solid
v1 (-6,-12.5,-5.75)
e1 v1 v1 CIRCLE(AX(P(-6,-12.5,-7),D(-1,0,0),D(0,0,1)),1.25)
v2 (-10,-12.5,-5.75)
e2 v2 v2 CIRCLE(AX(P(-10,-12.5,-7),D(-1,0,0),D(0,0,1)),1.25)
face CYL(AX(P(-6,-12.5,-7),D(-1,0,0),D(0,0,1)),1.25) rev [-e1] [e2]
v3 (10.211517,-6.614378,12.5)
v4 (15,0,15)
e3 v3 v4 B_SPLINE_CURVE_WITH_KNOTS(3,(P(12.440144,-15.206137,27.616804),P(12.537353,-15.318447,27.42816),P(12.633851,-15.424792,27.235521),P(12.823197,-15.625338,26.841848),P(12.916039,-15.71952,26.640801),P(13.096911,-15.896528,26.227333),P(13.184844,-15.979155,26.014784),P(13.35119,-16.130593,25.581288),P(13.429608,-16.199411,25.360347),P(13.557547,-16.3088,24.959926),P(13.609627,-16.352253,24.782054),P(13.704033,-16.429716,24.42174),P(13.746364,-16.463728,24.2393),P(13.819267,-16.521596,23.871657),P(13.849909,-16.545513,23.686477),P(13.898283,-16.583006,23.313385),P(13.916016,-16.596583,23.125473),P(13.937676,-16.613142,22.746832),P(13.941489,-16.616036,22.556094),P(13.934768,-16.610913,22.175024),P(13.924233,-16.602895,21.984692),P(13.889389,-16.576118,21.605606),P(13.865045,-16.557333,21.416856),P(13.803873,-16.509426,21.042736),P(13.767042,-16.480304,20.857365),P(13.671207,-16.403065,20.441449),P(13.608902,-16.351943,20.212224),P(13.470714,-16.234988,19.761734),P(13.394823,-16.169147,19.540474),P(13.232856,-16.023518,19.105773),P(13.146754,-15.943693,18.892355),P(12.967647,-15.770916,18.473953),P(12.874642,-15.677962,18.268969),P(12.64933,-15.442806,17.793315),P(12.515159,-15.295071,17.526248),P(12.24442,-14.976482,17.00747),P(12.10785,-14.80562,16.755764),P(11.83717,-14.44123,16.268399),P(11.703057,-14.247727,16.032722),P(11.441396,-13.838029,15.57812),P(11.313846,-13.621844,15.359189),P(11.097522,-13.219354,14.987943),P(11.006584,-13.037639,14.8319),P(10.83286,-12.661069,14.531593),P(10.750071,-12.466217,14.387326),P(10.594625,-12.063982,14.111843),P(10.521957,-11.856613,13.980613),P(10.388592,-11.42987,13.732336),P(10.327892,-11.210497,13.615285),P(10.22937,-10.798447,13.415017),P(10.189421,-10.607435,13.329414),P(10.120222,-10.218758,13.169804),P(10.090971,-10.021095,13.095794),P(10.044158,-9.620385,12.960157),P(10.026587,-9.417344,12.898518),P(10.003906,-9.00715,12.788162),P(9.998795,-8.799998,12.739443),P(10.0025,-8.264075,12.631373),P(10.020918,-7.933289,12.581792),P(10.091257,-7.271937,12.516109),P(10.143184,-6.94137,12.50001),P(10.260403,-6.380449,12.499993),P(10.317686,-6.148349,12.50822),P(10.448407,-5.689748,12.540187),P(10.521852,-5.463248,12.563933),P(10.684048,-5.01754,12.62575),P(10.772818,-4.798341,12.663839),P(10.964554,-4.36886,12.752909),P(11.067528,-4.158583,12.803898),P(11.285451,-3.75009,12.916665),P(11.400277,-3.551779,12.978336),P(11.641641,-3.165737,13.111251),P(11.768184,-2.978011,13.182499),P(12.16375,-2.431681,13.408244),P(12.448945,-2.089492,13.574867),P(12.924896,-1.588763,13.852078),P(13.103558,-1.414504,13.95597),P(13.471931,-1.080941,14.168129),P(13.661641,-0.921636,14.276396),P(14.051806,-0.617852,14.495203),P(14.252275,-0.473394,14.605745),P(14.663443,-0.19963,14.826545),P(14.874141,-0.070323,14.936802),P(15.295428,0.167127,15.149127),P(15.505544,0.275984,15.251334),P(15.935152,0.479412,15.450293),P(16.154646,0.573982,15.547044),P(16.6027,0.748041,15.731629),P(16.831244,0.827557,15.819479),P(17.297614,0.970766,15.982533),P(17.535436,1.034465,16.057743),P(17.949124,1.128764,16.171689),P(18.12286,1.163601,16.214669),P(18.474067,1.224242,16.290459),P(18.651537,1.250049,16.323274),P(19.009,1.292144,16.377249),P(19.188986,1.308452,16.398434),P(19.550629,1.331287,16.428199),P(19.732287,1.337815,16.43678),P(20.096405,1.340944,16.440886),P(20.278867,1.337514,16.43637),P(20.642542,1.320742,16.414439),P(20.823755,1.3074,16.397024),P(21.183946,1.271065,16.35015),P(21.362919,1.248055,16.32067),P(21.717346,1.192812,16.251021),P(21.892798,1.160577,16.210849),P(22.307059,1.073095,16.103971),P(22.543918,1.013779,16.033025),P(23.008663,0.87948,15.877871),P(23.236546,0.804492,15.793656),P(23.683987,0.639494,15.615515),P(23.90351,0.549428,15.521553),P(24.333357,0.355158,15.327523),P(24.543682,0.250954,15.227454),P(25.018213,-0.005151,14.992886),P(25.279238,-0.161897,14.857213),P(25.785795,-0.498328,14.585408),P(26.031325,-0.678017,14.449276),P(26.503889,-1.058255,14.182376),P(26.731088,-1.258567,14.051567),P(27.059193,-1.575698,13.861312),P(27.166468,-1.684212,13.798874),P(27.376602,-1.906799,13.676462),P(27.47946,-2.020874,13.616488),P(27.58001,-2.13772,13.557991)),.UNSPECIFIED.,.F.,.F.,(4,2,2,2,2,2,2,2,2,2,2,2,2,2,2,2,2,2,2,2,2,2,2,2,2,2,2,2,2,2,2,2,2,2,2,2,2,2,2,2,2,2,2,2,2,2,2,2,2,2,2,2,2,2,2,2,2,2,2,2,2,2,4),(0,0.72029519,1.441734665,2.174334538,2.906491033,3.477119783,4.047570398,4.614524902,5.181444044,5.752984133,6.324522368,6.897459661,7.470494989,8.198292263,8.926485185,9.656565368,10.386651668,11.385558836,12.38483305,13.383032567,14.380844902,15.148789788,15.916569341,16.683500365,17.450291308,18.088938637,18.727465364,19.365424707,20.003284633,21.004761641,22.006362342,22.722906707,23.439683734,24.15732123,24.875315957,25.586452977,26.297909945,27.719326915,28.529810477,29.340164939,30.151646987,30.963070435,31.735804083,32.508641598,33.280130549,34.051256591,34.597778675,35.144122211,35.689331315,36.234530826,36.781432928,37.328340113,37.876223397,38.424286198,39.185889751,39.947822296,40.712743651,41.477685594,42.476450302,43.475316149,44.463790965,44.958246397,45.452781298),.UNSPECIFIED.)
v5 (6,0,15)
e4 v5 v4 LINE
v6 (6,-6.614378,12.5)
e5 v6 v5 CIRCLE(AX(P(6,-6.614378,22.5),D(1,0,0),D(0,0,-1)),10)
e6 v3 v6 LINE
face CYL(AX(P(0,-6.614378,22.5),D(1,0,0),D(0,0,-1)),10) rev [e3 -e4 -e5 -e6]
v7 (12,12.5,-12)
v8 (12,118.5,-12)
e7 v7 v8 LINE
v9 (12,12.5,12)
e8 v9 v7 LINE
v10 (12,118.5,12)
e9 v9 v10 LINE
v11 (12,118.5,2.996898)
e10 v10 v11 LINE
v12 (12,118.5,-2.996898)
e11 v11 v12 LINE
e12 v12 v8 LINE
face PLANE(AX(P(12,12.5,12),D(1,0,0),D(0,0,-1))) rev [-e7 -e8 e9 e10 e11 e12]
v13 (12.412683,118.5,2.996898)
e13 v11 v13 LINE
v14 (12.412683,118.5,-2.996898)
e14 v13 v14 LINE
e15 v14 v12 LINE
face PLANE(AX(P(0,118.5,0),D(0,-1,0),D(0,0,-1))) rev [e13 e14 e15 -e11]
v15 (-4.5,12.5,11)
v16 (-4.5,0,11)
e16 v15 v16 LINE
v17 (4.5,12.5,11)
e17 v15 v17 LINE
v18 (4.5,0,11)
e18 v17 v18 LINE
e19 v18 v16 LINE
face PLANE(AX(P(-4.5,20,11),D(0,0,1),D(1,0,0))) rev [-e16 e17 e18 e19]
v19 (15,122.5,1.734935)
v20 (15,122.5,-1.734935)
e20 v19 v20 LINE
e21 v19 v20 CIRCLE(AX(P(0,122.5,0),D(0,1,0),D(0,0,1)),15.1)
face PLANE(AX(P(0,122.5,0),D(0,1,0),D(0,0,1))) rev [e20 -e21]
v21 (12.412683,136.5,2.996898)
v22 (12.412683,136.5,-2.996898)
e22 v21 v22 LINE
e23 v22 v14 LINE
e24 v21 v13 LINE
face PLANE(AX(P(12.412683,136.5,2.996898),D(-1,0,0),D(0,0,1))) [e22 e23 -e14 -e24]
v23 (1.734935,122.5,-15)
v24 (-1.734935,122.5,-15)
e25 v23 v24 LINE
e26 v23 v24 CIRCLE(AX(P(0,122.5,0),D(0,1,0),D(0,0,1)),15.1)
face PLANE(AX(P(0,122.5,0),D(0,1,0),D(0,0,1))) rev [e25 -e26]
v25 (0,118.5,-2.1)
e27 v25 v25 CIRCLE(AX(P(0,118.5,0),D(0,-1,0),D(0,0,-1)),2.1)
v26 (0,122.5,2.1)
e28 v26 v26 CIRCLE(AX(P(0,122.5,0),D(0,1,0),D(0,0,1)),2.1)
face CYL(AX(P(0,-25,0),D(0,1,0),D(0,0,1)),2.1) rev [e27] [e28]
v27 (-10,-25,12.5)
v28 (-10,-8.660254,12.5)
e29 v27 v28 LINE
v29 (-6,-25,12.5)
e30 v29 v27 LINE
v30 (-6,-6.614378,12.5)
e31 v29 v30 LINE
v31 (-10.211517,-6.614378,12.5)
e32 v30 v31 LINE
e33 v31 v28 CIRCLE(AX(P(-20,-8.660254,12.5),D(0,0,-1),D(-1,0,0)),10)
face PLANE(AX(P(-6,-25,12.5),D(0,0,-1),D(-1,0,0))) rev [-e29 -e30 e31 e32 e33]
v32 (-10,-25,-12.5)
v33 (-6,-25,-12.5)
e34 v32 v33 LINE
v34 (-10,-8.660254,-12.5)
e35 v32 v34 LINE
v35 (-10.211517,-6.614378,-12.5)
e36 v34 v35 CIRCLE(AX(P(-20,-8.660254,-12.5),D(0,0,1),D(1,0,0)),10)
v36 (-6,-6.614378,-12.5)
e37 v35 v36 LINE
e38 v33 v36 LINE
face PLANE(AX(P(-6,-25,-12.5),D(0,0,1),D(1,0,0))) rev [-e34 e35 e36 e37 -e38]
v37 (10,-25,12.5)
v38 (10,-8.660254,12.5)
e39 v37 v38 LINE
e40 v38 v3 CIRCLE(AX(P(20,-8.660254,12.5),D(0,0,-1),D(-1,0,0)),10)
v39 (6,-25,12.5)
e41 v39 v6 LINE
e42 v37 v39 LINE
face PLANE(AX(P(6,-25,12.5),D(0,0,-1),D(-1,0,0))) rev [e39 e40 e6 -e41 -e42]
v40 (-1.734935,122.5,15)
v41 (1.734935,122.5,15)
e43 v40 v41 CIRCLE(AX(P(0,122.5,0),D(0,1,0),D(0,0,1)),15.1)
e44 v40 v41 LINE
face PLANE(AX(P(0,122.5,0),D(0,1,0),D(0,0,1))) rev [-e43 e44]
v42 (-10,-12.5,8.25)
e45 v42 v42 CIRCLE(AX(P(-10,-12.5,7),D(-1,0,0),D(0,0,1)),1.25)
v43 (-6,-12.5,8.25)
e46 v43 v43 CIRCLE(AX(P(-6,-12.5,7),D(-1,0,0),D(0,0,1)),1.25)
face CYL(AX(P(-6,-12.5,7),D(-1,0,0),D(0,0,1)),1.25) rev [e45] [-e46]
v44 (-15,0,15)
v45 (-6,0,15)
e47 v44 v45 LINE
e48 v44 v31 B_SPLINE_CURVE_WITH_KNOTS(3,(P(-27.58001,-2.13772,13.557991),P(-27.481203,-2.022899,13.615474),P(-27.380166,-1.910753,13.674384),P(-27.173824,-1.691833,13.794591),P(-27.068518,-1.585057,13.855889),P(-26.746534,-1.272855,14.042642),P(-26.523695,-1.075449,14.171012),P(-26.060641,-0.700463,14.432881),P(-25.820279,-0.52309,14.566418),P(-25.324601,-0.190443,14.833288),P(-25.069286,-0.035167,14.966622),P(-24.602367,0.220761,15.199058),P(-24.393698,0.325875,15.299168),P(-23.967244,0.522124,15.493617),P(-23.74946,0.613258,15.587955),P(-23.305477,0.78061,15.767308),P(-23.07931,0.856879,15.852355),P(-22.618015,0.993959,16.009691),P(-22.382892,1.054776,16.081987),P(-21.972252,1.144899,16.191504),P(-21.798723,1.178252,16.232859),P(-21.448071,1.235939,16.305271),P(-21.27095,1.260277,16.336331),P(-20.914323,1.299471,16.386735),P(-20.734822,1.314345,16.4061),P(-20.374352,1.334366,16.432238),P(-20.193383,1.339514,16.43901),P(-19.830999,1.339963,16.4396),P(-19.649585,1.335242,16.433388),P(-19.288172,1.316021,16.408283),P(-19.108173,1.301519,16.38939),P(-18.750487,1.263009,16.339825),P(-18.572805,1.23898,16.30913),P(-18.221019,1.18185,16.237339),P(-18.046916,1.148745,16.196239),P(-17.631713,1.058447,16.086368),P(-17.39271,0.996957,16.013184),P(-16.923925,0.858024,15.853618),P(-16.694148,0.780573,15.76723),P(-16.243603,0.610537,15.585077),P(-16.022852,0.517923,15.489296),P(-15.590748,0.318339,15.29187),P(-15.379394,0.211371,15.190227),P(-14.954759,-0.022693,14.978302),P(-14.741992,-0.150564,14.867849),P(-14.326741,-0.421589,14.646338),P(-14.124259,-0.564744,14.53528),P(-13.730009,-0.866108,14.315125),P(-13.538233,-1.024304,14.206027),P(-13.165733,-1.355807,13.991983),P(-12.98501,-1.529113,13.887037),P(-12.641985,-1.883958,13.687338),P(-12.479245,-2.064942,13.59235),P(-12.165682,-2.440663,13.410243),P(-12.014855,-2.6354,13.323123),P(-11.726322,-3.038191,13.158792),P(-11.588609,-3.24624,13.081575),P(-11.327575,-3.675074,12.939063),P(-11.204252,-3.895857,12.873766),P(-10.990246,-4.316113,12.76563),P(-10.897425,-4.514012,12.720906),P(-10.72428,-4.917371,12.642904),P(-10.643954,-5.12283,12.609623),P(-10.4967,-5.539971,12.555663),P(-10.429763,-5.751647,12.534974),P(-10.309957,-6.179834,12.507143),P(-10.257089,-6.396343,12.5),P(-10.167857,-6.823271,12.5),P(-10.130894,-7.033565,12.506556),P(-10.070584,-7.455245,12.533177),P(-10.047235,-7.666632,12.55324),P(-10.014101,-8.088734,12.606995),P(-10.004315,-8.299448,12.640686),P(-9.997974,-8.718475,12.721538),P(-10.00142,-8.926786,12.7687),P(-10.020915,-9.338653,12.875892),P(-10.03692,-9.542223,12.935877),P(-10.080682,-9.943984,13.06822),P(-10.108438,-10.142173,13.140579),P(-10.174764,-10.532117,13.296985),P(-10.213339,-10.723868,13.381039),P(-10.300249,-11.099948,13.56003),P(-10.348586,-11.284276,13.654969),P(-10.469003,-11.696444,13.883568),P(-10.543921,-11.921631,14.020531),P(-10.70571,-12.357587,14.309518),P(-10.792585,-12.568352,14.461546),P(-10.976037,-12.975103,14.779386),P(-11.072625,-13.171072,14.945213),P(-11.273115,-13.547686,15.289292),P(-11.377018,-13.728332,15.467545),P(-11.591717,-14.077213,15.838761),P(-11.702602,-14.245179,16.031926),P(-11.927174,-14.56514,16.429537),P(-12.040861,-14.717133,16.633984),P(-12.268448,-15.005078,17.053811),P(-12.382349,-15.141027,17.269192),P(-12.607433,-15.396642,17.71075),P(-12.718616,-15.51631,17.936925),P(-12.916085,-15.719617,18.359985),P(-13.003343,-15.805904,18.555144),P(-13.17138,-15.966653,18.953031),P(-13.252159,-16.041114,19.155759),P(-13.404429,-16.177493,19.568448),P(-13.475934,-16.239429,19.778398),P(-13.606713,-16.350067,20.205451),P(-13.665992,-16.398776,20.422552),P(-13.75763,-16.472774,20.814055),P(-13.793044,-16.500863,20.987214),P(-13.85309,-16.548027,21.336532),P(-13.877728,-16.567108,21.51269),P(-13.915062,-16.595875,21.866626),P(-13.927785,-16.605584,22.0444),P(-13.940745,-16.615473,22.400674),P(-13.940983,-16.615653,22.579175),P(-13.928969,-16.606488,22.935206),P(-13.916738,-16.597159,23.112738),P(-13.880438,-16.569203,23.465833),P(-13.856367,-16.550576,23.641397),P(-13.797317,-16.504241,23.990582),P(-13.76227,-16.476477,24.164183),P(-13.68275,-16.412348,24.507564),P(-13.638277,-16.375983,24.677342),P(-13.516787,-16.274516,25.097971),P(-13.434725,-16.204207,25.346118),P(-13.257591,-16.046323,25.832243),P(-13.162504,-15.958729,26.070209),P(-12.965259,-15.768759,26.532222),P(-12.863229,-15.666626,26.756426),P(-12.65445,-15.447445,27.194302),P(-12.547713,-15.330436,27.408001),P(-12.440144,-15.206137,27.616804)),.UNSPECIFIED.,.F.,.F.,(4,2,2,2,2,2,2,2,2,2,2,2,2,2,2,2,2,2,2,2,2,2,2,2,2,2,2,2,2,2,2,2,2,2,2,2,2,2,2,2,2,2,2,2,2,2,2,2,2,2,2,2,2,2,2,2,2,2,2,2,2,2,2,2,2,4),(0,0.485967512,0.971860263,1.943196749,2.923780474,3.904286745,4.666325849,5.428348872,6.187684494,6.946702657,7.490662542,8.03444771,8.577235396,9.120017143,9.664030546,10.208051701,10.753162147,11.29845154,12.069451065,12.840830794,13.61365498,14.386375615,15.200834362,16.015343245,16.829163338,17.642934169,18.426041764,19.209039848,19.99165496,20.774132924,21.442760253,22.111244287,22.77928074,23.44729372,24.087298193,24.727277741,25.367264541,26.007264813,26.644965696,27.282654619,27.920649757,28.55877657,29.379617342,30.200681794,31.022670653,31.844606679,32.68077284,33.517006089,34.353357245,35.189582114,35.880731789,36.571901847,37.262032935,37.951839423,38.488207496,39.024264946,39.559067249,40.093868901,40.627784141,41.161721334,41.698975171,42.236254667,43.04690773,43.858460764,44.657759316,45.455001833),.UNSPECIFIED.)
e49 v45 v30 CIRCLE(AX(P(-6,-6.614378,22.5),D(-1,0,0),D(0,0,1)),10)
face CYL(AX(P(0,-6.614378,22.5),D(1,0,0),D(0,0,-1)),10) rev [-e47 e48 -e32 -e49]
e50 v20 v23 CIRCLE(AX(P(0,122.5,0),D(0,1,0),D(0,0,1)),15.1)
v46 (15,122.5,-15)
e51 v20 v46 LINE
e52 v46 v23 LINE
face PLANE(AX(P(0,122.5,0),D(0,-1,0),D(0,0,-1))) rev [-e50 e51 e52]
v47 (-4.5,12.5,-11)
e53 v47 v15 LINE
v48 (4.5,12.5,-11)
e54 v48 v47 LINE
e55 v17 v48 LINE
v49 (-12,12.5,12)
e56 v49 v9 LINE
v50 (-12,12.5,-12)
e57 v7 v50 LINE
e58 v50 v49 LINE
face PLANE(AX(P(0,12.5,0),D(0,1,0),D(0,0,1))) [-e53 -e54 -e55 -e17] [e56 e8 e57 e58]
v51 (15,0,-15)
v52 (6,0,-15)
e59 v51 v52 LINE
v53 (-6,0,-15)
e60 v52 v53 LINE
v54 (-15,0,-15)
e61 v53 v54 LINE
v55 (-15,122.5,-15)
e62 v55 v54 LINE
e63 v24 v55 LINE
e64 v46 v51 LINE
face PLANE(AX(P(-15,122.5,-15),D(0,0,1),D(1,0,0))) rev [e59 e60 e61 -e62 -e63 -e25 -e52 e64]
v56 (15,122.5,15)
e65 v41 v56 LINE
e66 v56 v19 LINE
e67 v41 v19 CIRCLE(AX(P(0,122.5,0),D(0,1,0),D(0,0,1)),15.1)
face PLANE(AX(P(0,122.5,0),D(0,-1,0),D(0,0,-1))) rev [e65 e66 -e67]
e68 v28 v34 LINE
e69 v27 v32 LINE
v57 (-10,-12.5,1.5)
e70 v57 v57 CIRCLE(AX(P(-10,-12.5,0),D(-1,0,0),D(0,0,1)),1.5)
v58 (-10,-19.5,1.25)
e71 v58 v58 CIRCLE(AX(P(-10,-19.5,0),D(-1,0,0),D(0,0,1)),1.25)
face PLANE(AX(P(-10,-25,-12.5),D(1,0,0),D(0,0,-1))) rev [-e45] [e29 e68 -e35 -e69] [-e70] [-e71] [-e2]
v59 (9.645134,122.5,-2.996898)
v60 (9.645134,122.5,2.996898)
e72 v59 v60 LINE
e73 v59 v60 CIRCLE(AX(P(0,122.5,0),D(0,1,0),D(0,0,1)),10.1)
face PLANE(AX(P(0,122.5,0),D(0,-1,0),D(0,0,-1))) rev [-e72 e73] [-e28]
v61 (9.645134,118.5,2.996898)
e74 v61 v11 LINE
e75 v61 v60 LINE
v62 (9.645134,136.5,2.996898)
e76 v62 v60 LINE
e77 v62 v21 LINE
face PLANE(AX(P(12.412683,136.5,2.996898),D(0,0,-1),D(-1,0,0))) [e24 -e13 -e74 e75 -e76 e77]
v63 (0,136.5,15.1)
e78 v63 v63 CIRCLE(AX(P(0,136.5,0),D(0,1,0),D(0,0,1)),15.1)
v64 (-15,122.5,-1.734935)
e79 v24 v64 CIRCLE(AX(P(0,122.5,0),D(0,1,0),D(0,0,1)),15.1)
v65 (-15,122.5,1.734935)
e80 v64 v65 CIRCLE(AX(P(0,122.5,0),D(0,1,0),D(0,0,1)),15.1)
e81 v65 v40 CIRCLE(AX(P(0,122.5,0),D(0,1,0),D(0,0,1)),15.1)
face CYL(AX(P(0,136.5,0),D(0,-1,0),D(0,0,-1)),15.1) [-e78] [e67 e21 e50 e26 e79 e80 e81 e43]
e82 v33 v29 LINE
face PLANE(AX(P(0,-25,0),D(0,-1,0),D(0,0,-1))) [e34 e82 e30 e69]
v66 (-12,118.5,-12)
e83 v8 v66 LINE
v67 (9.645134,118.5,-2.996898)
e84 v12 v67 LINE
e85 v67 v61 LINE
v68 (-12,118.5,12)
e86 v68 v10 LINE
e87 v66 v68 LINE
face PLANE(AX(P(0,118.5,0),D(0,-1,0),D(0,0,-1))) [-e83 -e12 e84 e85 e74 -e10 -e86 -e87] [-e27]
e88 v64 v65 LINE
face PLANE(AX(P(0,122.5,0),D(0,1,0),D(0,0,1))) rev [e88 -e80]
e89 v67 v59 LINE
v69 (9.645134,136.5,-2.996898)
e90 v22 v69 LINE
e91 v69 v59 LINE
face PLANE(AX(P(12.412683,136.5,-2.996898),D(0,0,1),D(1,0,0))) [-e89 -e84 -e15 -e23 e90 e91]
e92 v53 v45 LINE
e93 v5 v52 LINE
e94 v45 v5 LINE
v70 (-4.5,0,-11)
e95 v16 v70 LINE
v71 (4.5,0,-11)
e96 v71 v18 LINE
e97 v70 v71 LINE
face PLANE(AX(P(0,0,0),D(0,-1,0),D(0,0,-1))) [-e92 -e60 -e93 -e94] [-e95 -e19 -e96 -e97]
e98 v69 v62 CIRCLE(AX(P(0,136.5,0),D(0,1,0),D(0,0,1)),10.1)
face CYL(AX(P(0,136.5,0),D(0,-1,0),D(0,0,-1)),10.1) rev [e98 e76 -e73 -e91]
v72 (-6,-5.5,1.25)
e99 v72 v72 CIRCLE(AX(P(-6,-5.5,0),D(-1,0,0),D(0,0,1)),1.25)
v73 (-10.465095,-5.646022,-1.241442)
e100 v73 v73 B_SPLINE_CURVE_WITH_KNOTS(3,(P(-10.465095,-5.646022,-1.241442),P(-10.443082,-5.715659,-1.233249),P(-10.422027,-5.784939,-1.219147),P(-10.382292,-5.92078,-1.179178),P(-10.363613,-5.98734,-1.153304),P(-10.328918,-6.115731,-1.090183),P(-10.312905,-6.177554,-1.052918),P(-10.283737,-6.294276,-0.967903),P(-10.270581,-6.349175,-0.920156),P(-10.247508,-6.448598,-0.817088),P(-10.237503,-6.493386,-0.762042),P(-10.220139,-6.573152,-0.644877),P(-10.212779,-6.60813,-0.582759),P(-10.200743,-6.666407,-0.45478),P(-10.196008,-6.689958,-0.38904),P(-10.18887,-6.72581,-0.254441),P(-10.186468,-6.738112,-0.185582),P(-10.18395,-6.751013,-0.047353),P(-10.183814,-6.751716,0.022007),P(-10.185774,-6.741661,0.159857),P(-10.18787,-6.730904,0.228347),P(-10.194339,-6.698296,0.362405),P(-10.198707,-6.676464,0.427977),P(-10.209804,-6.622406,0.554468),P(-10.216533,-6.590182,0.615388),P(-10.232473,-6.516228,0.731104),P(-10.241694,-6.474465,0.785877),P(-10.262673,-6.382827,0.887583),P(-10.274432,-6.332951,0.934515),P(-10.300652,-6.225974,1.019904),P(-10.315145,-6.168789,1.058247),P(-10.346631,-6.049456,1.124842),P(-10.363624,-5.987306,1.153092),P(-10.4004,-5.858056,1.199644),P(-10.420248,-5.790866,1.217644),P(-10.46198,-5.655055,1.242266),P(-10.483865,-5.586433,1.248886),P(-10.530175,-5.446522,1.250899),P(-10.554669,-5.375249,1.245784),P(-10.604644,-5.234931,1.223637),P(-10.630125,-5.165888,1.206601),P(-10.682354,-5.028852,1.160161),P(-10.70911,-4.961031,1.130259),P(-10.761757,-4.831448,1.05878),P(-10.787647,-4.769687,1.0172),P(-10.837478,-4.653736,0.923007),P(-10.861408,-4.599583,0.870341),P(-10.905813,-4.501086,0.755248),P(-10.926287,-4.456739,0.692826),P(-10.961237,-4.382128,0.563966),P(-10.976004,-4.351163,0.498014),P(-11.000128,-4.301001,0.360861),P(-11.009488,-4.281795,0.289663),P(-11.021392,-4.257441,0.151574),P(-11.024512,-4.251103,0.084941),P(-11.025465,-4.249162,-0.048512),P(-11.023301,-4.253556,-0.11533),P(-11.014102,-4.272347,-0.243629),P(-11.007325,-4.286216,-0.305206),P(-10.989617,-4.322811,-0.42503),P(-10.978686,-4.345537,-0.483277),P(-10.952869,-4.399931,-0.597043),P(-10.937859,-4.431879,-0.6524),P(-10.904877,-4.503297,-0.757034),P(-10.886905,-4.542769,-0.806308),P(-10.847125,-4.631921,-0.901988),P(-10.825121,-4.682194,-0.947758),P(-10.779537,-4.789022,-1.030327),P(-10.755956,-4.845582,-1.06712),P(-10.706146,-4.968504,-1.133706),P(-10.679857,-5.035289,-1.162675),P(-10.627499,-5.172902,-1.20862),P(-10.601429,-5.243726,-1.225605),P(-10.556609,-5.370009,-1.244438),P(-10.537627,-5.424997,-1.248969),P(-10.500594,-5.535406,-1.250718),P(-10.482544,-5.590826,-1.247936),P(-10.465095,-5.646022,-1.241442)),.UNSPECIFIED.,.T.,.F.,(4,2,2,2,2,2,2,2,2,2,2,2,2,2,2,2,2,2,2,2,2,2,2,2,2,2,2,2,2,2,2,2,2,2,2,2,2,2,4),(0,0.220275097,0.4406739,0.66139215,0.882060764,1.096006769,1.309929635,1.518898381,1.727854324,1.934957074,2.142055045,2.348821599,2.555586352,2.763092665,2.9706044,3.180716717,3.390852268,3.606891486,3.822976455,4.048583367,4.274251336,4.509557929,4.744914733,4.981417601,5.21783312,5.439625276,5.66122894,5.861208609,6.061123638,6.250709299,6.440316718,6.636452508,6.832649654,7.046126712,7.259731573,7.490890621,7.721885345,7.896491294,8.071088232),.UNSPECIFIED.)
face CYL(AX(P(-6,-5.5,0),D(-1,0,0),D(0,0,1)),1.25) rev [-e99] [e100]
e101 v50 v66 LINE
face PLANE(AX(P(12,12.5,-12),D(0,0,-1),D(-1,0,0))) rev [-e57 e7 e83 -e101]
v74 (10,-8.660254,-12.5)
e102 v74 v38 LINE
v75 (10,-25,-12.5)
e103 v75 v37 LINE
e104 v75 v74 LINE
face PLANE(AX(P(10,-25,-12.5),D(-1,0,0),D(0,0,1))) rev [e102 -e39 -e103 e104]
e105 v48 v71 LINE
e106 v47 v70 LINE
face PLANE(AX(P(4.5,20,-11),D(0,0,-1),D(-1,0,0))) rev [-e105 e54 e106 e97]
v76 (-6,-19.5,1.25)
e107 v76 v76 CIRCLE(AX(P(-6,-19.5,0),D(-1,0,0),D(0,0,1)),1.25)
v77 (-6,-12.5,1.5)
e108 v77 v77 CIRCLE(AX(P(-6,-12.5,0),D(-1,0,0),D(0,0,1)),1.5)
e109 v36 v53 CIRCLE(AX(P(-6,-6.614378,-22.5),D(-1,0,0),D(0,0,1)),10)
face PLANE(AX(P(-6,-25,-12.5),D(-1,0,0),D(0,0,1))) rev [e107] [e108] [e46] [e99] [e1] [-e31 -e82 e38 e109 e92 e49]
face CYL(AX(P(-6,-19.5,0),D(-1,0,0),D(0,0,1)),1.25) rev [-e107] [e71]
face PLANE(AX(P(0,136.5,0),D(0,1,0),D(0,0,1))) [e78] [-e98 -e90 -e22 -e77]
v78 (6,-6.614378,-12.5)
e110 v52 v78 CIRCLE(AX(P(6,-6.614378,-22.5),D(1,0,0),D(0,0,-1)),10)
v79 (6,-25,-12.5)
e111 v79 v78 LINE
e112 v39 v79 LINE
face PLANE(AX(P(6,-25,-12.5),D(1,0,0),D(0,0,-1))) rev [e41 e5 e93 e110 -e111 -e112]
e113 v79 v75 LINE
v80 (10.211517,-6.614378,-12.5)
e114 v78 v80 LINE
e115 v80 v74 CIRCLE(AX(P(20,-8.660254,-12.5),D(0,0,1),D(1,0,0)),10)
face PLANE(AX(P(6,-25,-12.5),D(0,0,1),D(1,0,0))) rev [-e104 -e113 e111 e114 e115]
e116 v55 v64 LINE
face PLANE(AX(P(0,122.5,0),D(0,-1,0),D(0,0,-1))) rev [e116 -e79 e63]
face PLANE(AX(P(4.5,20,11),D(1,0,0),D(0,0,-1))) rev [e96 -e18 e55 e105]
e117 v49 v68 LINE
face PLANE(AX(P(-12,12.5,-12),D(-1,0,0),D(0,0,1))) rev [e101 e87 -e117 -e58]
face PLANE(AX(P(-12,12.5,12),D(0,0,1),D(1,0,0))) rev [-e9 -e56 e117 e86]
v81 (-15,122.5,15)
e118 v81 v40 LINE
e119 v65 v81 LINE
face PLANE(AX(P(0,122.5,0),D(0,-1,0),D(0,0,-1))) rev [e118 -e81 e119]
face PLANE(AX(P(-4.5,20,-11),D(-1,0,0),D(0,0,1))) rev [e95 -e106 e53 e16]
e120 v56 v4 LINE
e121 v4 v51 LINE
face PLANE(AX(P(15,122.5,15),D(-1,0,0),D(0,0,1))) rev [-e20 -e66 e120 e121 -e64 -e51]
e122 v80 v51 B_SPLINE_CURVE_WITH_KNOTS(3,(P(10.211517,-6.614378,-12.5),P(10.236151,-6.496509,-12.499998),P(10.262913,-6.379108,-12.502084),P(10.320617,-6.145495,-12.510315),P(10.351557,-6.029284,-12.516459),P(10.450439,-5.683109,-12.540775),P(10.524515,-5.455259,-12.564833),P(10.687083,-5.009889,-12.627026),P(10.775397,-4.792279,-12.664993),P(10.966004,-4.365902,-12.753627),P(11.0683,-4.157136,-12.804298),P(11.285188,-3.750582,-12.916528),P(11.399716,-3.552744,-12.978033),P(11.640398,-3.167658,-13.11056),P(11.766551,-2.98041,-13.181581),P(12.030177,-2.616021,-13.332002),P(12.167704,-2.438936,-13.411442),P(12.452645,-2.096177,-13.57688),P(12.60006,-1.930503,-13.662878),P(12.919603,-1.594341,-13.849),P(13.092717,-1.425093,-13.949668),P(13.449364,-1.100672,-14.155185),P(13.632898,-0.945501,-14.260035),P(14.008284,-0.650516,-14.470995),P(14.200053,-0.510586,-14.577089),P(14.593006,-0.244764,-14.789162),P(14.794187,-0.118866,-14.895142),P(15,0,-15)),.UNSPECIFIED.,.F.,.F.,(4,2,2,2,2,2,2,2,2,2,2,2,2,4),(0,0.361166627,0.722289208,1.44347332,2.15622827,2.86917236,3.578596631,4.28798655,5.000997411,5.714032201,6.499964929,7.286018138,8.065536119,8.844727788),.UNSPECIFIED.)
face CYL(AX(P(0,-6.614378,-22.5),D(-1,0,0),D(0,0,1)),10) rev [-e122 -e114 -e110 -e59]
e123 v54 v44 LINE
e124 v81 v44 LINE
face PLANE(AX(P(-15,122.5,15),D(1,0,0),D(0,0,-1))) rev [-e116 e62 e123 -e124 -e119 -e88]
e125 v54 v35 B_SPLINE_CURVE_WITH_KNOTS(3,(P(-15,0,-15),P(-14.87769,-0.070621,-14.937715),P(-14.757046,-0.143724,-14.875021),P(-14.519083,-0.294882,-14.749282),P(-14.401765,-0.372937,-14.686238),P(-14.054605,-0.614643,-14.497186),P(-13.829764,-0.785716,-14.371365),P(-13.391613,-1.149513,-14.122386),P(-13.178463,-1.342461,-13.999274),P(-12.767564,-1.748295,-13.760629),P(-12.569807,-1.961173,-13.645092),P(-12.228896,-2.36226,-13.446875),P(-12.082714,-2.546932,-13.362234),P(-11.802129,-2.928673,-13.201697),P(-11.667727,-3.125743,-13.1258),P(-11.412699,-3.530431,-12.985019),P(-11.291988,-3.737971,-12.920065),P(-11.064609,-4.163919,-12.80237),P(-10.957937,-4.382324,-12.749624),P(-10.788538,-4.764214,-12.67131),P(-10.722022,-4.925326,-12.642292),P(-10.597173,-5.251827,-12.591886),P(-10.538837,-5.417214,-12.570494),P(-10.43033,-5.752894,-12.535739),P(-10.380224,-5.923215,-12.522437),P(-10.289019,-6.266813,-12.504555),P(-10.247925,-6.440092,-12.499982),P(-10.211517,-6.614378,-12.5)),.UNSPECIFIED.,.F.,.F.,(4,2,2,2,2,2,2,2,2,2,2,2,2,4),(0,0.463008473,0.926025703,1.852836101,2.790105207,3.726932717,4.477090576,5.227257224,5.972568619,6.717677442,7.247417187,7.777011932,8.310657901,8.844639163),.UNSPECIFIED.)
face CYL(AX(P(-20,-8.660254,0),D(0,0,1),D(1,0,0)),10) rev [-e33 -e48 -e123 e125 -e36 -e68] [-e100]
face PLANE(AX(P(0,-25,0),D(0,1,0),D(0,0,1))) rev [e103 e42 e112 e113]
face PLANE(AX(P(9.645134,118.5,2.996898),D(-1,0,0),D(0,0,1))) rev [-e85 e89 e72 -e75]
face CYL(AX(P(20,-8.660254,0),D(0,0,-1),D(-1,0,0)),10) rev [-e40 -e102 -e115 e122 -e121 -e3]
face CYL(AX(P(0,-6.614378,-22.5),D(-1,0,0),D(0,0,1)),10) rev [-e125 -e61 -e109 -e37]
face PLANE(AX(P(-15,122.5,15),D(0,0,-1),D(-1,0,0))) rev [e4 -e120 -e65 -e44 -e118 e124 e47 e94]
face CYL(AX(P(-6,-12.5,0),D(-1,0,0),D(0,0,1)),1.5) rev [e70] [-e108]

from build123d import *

# Parameters (mm, degrees)
SKETCH1_W           = 30
SKETCH1_H           = 30
BOSS_EXTRUDE1_DEPTH = 122.5
SKETCH2_W           = 4
SKETCH2_H           = 25
BOSS_EXTRUDE2_DEPTH = 25
SKETCH3_W           = 24
SKETCH3_H           = 24
CUT_EXTRUDE1_DEPTH  = 110
SKETCH5_W           = 24
SKETCH5_H           = 24
BOSS_EXTRUDE4_DEPTH = 4
SKETCH4_R           = 15.1
BOSS_EXTRUDE3_DEPTH = 14
SKETCH7_W           = 2.767549144
SKETCH7_H           = 5.993795478
CUT_EXTRUDE3_DEPTH  = 4
SKETCH12_R          = 2.1
CUT_EXTRUDE6_DEPTH  = 150.037813994
SKETCH13_W          = 9
SKETCH13_H          = 22
CUT_EXTRUDE7_DEPTH  = 20
SKETCH8_R           = 1.25
SKETCH8_R_2         = 1.5
CUT_EXTRUDE4_DEPTH  = 4
FILLET1_R           = 10


with BuildPart() as part:
    # Sketch1 → Boss-Extrude1 (new body)
    with BuildSketch(Plane(origin=(0, 0, 0), x_dir=(1, 0, 0), z_dir=(0, 1, 0))):
        Rectangle(SKETCH1_W, SKETCH1_H)
    extrude(amount=BOSS_EXTRUDE1_DEPTH)

    # Sketch2 → Boss-Extrude2 (add)
    with BuildSketch(Plane.XZ):
        with Locations((-8, 0)):
            Rectangle(SKETCH2_W, SKETCH2_H)
        with Locations((8, 0)):
            Rectangle(SKETCH2_W, SKETCH2_H)
    extrude(amount=BOSS_EXTRUDE2_DEPTH)

    # Sketch3 → Cut-Extrude1 (cut)
    with BuildSketch(Plane(origin=(0, 122.5, 0), x_dir=(1, 0, 0), z_dir=(0, 1, 0))):
        Rectangle(SKETCH3_W, SKETCH3_H)
    extrude(amount=-CUT_EXTRUDE1_DEPTH, mode=Mode.SUBTRACT)

    # Sketch5 → Boss-Extrude4 (add)
    with BuildSketch(Plane(origin=(0, 122.5, 0), x_dir=(1, 0, 0), z_dir=(0, 1, 0))):
        Rectangle(SKETCH5_W, SKETCH5_H)
    extrude(amount=-BOSS_EXTRUDE4_DEPTH)

    # Sketch4 → Boss-Extrude3 (add)
    with BuildSketch(Plane(origin=(0, 122.5, 0), x_dir=(1, 0, 0), z_dir=(0, 1, 0))):
        with Locations(Location((0, 0, 0), (0, 0, 83.402352246))):
            Circle(SKETCH4_R)
        with BuildLine():
            Line((12.412682836, -2.996897739), (12.412682836, 2.996897739))
            Line((12.412682836, 2.996897739), (9.645133692, 2.996897739))
            ThreePointArc((9.645133692, 2.996897739), (-10.1, 0), (9.645133692, -2.996897739))
            Line((9.645133692, -2.996897739), (12.412682836, -2.996897739))
        make_face(mode=Mode.SUBTRACT)
    extrude(amount=BOSS_EXTRUDE3_DEPTH)

    # Sketch7 → Cut-Extrude3 (cut)
    with BuildSketch(Plane(origin=(0, 122.5, 0), x_dir=(1, 0, 0), z_dir=(0, 1, 0))):
        with Locations((11.028908264, 0)):
            Rectangle(SKETCH7_W, SKETCH7_H)
    extrude(amount=-CUT_EXTRUDE3_DEPTH, mode=Mode.SUBTRACT)

    # Sketch12 → Cut-Extrude6 (cut, through all)
    with BuildSketch(Plane(origin=(0, 122.5, 0), x_dir=(1, 0, 0), z_dir=(0, 1, 0))):
        with Locations(Location((0, 0, 0), (0, 0, 270))):
            Circle(SKETCH12_R)
    extrude(amount=-CUT_EXTRUDE6_DEPTH, mode=Mode.SUBTRACT)

    # Sketch13 → Cut-Extrude7 (cut)
    with BuildSketch(Plane.XZ):
        Rectangle(SKETCH13_W, SKETCH13_H)
    extrude(amount=-CUT_EXTRUDE7_DEPTH, mode=Mode.SUBTRACT)

    # Sketch8 → Cut-Extrude4 (cut)
    with BuildSketch(Plane.ZY.offset(10)):
        with Locations((0, -5.5)):
            Circle(SKETCH8_R)
        with Locations((7, -12.5)):
            Circle(SKETCH8_R)
        with Locations((0, -19.5)):
            Circle(SKETCH8_R)
        with Locations((-7, -12.5)):
            Circle(SKETCH8_R)
        with Locations((0, -12.5)):
            Circle(SKETCH8_R_2)
    extrude(amount=-CUT_EXTRUDE4_DEPTH, mode=Mode.SUBTRACT)

    # Fillet1
    # the kernel refuses this fillet: 10 mm, written as the material it adds along each edge
    with BuildSketch(Plane(origin=(-10.535945694, 0, -12.5), x_dir=(0, 0, -1), z_dir=(1, 0, 0))) as fillet1_piece_1_section:
        with BuildLine():
            CenterArc((10, -6.614378278), FILLET1_R, 138.590377891, 41.409622109)
            Line((0, -6.614378278), (-0.2, -6.614378278))
            Line((-0.2, -6.614378278), (-0.2, 0))
            Line((-0.2, 0), (0, 0.2))
            ThreePointArc((0, 0.2), (1.25, 0.2), (2.35, 0.132287566))
            Line((2.35, 0.132287566), (2.5, 0))
        make_face()
    fillet1_piece_1 = extrude(amount=20.535945694, mode=Mode.PRIVATE)
    fillet1_piece_1 = split(fillet1_piece_1, bisect_by=Plane(origin=(-10, -1.814075663, -13.097749904), z_dir=(1, 0, 0)), keep=Keep.TOP, mode=Mode.PRIVATE)
    fillet1_piece_1 = split(fillet1_piece_1, bisect_by=Plane(origin=(-6, -1.814075663, -13.097749904), z_dir=(-1, 0, 0)), keep=Keep.TOP, mode=Mode.PRIVATE)
    add(fillet1_piece_1)
    with BuildSketch(Plane(origin=(6, 0, -12.5), x_dir=(0, 0, -1), z_dir=(1, 0, 0)), Plane(origin=(10, 0, 12.5), x_dir=(0, 0, 1), z_dir=(-1, 0, 0))) as fillet1_piece_2:
        with BuildLine():
            CenterArc((10, -6.614378278), FILLET1_R, 138.590377891, 41.409622109)
            Line((0, -6.614378278), (-0.2, -6.614378278))
            Line((-0.2, -6.614378278), (-0.2, 0))
            Line((-0.2, 0), (0, 0.2))
            ThreePointArc((0, 0.2), (1.25, 0.2), (2.35, 0.132287566))
            Line((2.35, 0.132287566), (2.5, 0))
        make_face()
    extrude(amount=4)
    with BuildSketch(Plane(origin=(10, 0, -12.5), x_dir=(1, 0, 0), z_dir=(0, 0, 1))) as fillet1_piece_3:
        with BuildLine():
            CenterArc((10, -8.660254038), FILLET1_R, 120, 60)
            Line((0, -8.660254038), (-0.2, -8.660254038))
            Line((-0.2, -8.660254038), (-0.2, 0))
            Line((-0.2, 0), (0, 0.2))
            ThreePointArc((0, 0.2), (2.5, 0.2), (4.9, 0.173205081))
            Line((4.9, 0.173205081), (5, 0))
        make_face()
    extrude(amount=25)
    with BuildSketch(Plane(origin=(10, 0, 12.5), x_dir=(0, 0, 1), z_dir=(-1, 0, 0))) as fillet1_piece_4_section:
        with BuildLine():
            CenterArc((10, -6.614378278), FILLET1_R, 138.590377891, 41.409622109)
            Line((0, -6.614378278), (-0.2, -6.614378278))
            Line((-0.2, -6.614378278), (-0.2, 0))
            Line((-0.2, 0), (0, 0.2))
            ThreePointArc((0, 0.2), (1.25, 0.2), (2.35, 0.132287566))
            Line((2.35, 0.132287566), (2.5, 0))
        make_face()
    fillet1_piece_4 = extrude(amount=20.535945694, mode=Mode.PRIVATE)
    fillet1_piece_4 = split(fillet1_piece_4, bisect_by=Plane(origin=(-10, -1.814075663, 13.097749904), z_dir=(1, 0, 0)), keep=Keep.TOP, mode=Mode.PRIVATE)
    fillet1_piece_4 = split(fillet1_piece_4, bisect_by=Plane(origin=(-6, -1.814075663, 13.097749904), z_dir=(-1, 0, 0)), keep=Keep.TOP, mode=Mode.PRIVATE)
    add(fillet1_piece_4)
    with BuildSketch(Plane(origin=(-10, 0, 12.5), x_dir=(0, 0, 1), z_dir=(1, 0, 0)), Plane(origin=(-6, 0, -12.5), x_dir=(0, 0, -1), z_dir=(-1, 0, 0))) as fillet1_piece_5:
        with BuildLine():
            CenterArc((10, 6.614378278), FILLET1_R, 180, 41.409622109)
            Line((0, 6.614378278), (-0.2, 6.614378278))
            Line((-0.2, 6.614378278), (-0.2, 0))
            Line((-0.2, 0), (0, -0.2))
            ThreePointArc((0, -0.2), (1.25, -0.2), (2.35, -0.132287566))
            Line((2.35, -0.132287566), (2.5, 0))
        make_face()
    extrude(amount=4)
    with BuildSketch(Plane(origin=(-10, 0, 12.5), x_dir=(0, 0, 1), z_dir=(1, 0, 0))) as fillet1_piece_6_section:
        with BuildLine():
            CenterArc((10, 6.614378278), FILLET1_R, 180, 41.409622109)
            Line((0, 6.614378278), (-0.2, 6.614378278))
            Line((-0.2, 6.614378278), (-0.2, 0))
            Line((-0.2, 0), (0, -0.2))
            ThreePointArc((0, -0.2), (1.25, -0.2), (2.35, -0.132287566))
            Line((2.35, -0.132287566), (2.5, 0))
        make_face()
    fillet1_piece_6 = extrude(amount=20.535945694, mode=Mode.PRIVATE)
    fillet1_piece_6 = split(fillet1_piece_6, bisect_by=Plane(origin=(6, -1.814075663, 13.097749904), z_dir=(1, 0, 0)), keep=Keep.TOP, mode=Mode.PRIVATE)
    fillet1_piece_6 = split(fillet1_piece_6, bisect_by=Plane(origin=(10, -1.814075663, 13.097749904), z_dir=(-1, 0, 0)), keep=Keep.TOP, mode=Mode.PRIVATE)
    add(fillet1_piece_6)
    with BuildSketch(Plane(origin=(-10, 0, -12.5), x_dir=(-1, 0, 0), z_dir=(0, 0, 1))) as fillet1_piece_7_section:
        with BuildLine():
            CenterArc((10, 8.660254038), FILLET1_R, 180, 60)
            Line((0, 8.660254038), (-0.2, 8.660254038))
            Line((-0.2, 8.660254038), (-0.2, 0))
            Line((-0.2, 0), (0, -0.2))
            ThreePointArc((0, -0.2), (2.5, -0.2), (4.9, -0.173205081))
            Line((4.9, -0.173205081), (5, 0))
        make_face()
    fillet1_piece_7 = extrude(amount=25, mode=Mode.PRIVATE)
    fillet1_piece_7 = fillet1_piece_7 - Plane(origin=(-11.30561436, -5.5, 0), x_dir=(0, 0, 1), z_dir=(-1, 0, 0)) * Cylinder(1.25, 85, mode=Mode.PRIVATE)
    add(fillet1_piece_7)
    with BuildSketch(Plane(origin=(10.535945694, 0, -12.5), x_dir=(0, 0, -1), z_dir=(-1, 0, 0))) as fillet1_piece_8_section:
        with BuildLine():
            CenterArc((10, 6.614378278), FILLET1_R, 180, 41.409622109)
            Line((0, 6.614378278), (-0.2, 6.614378278))
            Line((-0.2, 6.614378278), (-0.2, 0))
            Line((-0.2, 0), (0, -0.2))
            ThreePointArc((0, -0.2), (1.25, -0.2), (2.35, -0.132287566))
            Line((2.35, -0.132287566), (2.5, 0))
        make_face()
    fillet1_piece_8 = extrude(amount=20.535945694, mode=Mode.PRIVATE)
    fillet1_piece_8 = split(fillet1_piece_8, bisect_by=Plane(origin=(6, -1.814075663, -13.097749904), z_dir=(1, 0, 0)), keep=Keep.TOP, mode=Mode.PRIVATE)
    fillet1_piece_8 = split(fillet1_piece_8, bisect_by=Plane(origin=(10, -1.814075663, -13.097749904), z_dir=(-1, 0, 0)), keep=Keep.TOP, mode=Mode.PRIVATE)
    add(fillet1_piece_8)
    with BuildSketch(Plane(origin=(6, 0, -12.5), x_dir=(0, 0, -1), z_dir=(1, 0, 0))) as fillet1_piece_9a_section:
        with BuildLine():
            CenterArc((10, -6.614378278), FILLET1_R, 138.590377891, 41.409622109)
            Line((0, -6.614378278), (-0.2, -6.614378278))
            Line((-0.2, -6.614378278), (-0.2, 0))
            Line((-0.2, 0), (0, 0.2))
            ThreePointArc((0, 0.2), (1.25, 0.2), (2.35, 0.132287566))
            Line((2.35, 0.132287566), (2.5, 0))
        make_face()
    fillet1_piece_9a = extrude(amount=20.535945694, mode=Mode.PRIVATE)
    fillet1_piece_9a = split(fillet1_piece_9a, bisect_by=Plane(origin=(15, -1.814075663, -13.097749904), z_dir=(-1, 0, 0)), keep=Keep.TOP, mode=Mode.PRIVATE)
    fillet1_piece_9a = split(fillet1_piece_9a, bisect_by=Plane(origin=(10, -1.814075663, -13.097749904), z_dir=(1, 0, 0)), keep=Keep.TOP, mode=Mode.PRIVATE)
    with BuildSketch(Plane(origin=(10, 0, -34.150635095), x_dir=(1, 0, 0), z_dir=(0, 0, 1))) as fillet1_piece_9b_section:
        with BuildLine():
            CenterArc((10, -8.660254038), FILLET1_R, 120, 60)
            Line((0, -8.660254038), (-0.2, -8.660254038))
            Line((-0.2, -8.660254038), (-0.2, 0))
            Line((-0.2, 0), (0, 0.2))
            ThreePointArc((0, 0.2), (2.5, 0.2), (4.9, 0.173205081))
            Line((4.9, 0.173205081), (5, 0))
        make_face()
    fillet1_piece_9b = extrude(amount=46.650635095, mode=Mode.PRIVATE)
    fillet1_piece_9b = split(fillet1_piece_9b, bisect_by=Plane(origin=(11.295167111, -2.163104458, -15), z_dir=(0, 0, 1)), keep=Keep.TOP, mode=Mode.PRIVATE)
    fillet1_piece_9b = split(fillet1_piece_9b, bisect_by=Plane(origin=(11.295167111, -2.163104458, -12.5), z_dir=(0, 0, -1)), keep=Keep.TOP, mode=Mode.PRIVATE)
    fillet1_piece_9 = fillet1_piece_9a & fillet1_piece_9b
    add(fillet1_piece_9)
    with BuildSketch(Plane(origin=(26.535945694, 0, 12.5), x_dir=(0, 0, 1), z_dir=(-1, 0, 0))) as fillet1_piece_10a_section:
        with BuildLine():
            CenterArc((10, -6.614378278), FILLET1_R, 138.590377891, 41.409622109)
            Line((0, -6.614378278), (-0.2, -6.614378278))
            Line((-0.2, -6.614378278), (-0.2, 0))
            Line((-0.2, 0), (0, 0.2))
            ThreePointArc((0, 0.2), (1.25, 0.2), (2.35, 0.132287566))
            Line((2.35, 0.132287566), (2.5, 0))
        make_face()
    fillet1_piece_10a = extrude(amount=20.535945694, mode=Mode.PRIVATE)
    fillet1_piece_10a = split(fillet1_piece_10a, bisect_by=Plane(origin=(15, -1.814075663, 13.097749904), z_dir=(-1, 0, 0)), keep=Keep.TOP, mode=Mode.PRIVATE)
    fillet1_piece_10a = split(fillet1_piece_10a, bisect_by=Plane(origin=(10, -1.814075663, 13.097749904), z_dir=(1, 0, 0)), keep=Keep.TOP, mode=Mode.PRIVATE)
    with BuildSketch(Plane(origin=(10, 0, -12.5), x_dir=(1, 0, 0), z_dir=(0, 0, 1))) as fillet1_piece_10b_section:
        with BuildLine():
            CenterArc((10, -8.660254038), FILLET1_R, 120, 60)
            Line((0, -8.660254038), (-0.2, -8.660254038))
            Line((-0.2, -8.660254038), (-0.2, 0))
            Line((-0.2, 0), (0, 0.2))
            ThreePointArc((0, 0.2), (2.5, 0.2), (4.9, 0.173205081))
            Line((4.9, 0.173205081), (5, 0))
        make_face()
    fillet1_piece_10b = extrude(amount=46.650635095, mode=Mode.PRIVATE)
    fillet1_piece_10b = split(fillet1_piece_10b, bisect_by=Plane(origin=(11.295167111, -2.163104458, 15), z_dir=(0, 0, -1)), keep=Keep.TOP, mode=Mode.PRIVATE)
    fillet1_piece_10b = split(fillet1_piece_10b, bisect_by=Plane(origin=(11.295167111, -2.163104458, 12.5), z_dir=(0, 0, 1)), keep=Keep.TOP, mode=Mode.PRIVATE)
    fillet1_piece_10 = fillet1_piece_10a & fillet1_piece_10b
    add(fillet1_piece_10)
    with BuildSketch(Plane(origin=(-10, 0, -12.5), x_dir=(-1, 0, 0), z_dir=(0, 0, 1))) as fillet1_piece_11a_section:
        with BuildLine():
            CenterArc((10, 8.660254038), FILLET1_R, 180, 60)
            Line((0, 8.660254038), (-0.2, 8.660254038))
            Line((-0.2, 8.660254038), (-0.2, 0))
            Line((-0.2, 0), (0, -0.2))
            ThreePointArc((0, -0.2), (2.5, -0.2), (4.9, -0.173205081))
            Line((4.9, -0.173205081), (5, 0))
        make_face()
    fillet1_piece_11a = extrude(amount=46.650635095, mode=Mode.PRIVATE)
    fillet1_piece_11a = split(fillet1_piece_11a, bisect_by=Plane(origin=(-11.295167111, -2.163104458, 15), z_dir=(0, 0, -1)), keep=Keep.TOP, mode=Mode.PRIVATE)
    fillet1_piece_11a = split(fillet1_piece_11a, bisect_by=Plane(origin=(-11.295167111, -2.163104458, 12.5), z_dir=(0, 0, 1)), keep=Keep.TOP, mode=Mode.PRIVATE)
    with BuildSketch(Plane(origin=(-26.535945694, 0, 12.5), x_dir=(0, 0, 1), z_dir=(1, 0, 0))) as fillet1_piece_11b_section:
        with BuildLine():
            CenterArc((10, 6.614378278), FILLET1_R, 180, 41.409622109)
            Line((0, 6.614378278), (-0.2, 6.614378278))
            Line((-0.2, 6.614378278), (-0.2, 0))
            Line((-0.2, 0), (0, -0.2))
            ThreePointArc((0, -0.2), (1.25, -0.2), (2.35, -0.132287566))
            Line((2.35, -0.132287566), (2.5, 0))
        make_face()
    fillet1_piece_11b = extrude(amount=20.535945694, mode=Mode.PRIVATE)
    fillet1_piece_11b = split(fillet1_piece_11b, bisect_by=Plane(origin=(-15, -1.814075663, 13.097749904), z_dir=(1, 0, 0)), keep=Keep.TOP, mode=Mode.PRIVATE)
    fillet1_piece_11b = split(fillet1_piece_11b, bisect_by=Plane(origin=(-10, -1.814075663, 13.097749904), z_dir=(-1, 0, 0)), keep=Keep.TOP, mode=Mode.PRIVATE)
    fillet1_piece_11 = fillet1_piece_11a & fillet1_piece_11b
    add(fillet1_piece_11)
    with BuildSketch(Plane(origin=(-10, 0, -34.150635095), x_dir=(-1, 0, 0), z_dir=(0, 0, 1))) as fillet1_piece_12a_section:
        with BuildLine():
            CenterArc((10, 8.660254038), FILLET1_R, 180, 60)
            Line((0, 8.660254038), (-0.2, 8.660254038))
            Line((-0.2, 8.660254038), (-0.2, 0))
            Line((-0.2, 0), (0, -0.2))
            ThreePointArc((0, -0.2), (2.5, -0.2), (4.9, -0.173205081))
            Line((4.9, -0.173205081), (5, 0))
        make_face()
    fillet1_piece_12a = extrude(amount=46.650635095, mode=Mode.PRIVATE)
    fillet1_piece_12a = split(fillet1_piece_12a, bisect_by=Plane(origin=(-11.295167111, -2.163104458, -15), z_dir=(0, 0, 1)), keep=Keep.TOP, mode=Mode.PRIVATE)
    fillet1_piece_12a = split(fillet1_piece_12a, bisect_by=Plane(origin=(-11.295167111, -2.163104458, -12.5), z_dir=(0, 0, -1)), keep=Keep.TOP, mode=Mode.PRIVATE)
    with BuildSketch(Plane(origin=(-6, 0, -12.5), x_dir=(0, 0, -1), z_dir=(-1, 0, 0))) as fillet1_piece_12b_section:
        with BuildLine():
            CenterArc((10, 6.614378278), FILLET1_R, 180, 41.409622109)
            Line((0, 6.614378278), (-0.2, 6.614378278))
            Line((-0.2, 6.614378278), (-0.2, 0))
            Line((-0.2, 0), (0, -0.2))
            ThreePointArc((0, -0.2), (1.25, -0.2), (2.35, -0.132287566))
            Line((2.35, -0.132287566), (2.5, 0))
        make_face()
    fillet1_piece_12b = extrude(amount=20.535945694, mode=Mode.PRIVATE)
    fillet1_piece_12b = split(fillet1_piece_12b, bisect_by=Plane(origin=(-15, -1.814075663, -13.097749904), z_dir=(1, 0, 0)), keep=Keep.TOP, mode=Mode.PRIVATE)
    fillet1_piece_12b = split(fillet1_piece_12b, bisect_by=Plane(origin=(-10, -1.814075663, -13.097749904), z_dir=(-1, 0, 0)), keep=Keep.TOP, mode=Mode.PRIVATE)
    fillet1_piece_12 = fillet1_piece_12a & fillet1_piece_12b
    add(fillet1_piece_12)


solid = part.part
